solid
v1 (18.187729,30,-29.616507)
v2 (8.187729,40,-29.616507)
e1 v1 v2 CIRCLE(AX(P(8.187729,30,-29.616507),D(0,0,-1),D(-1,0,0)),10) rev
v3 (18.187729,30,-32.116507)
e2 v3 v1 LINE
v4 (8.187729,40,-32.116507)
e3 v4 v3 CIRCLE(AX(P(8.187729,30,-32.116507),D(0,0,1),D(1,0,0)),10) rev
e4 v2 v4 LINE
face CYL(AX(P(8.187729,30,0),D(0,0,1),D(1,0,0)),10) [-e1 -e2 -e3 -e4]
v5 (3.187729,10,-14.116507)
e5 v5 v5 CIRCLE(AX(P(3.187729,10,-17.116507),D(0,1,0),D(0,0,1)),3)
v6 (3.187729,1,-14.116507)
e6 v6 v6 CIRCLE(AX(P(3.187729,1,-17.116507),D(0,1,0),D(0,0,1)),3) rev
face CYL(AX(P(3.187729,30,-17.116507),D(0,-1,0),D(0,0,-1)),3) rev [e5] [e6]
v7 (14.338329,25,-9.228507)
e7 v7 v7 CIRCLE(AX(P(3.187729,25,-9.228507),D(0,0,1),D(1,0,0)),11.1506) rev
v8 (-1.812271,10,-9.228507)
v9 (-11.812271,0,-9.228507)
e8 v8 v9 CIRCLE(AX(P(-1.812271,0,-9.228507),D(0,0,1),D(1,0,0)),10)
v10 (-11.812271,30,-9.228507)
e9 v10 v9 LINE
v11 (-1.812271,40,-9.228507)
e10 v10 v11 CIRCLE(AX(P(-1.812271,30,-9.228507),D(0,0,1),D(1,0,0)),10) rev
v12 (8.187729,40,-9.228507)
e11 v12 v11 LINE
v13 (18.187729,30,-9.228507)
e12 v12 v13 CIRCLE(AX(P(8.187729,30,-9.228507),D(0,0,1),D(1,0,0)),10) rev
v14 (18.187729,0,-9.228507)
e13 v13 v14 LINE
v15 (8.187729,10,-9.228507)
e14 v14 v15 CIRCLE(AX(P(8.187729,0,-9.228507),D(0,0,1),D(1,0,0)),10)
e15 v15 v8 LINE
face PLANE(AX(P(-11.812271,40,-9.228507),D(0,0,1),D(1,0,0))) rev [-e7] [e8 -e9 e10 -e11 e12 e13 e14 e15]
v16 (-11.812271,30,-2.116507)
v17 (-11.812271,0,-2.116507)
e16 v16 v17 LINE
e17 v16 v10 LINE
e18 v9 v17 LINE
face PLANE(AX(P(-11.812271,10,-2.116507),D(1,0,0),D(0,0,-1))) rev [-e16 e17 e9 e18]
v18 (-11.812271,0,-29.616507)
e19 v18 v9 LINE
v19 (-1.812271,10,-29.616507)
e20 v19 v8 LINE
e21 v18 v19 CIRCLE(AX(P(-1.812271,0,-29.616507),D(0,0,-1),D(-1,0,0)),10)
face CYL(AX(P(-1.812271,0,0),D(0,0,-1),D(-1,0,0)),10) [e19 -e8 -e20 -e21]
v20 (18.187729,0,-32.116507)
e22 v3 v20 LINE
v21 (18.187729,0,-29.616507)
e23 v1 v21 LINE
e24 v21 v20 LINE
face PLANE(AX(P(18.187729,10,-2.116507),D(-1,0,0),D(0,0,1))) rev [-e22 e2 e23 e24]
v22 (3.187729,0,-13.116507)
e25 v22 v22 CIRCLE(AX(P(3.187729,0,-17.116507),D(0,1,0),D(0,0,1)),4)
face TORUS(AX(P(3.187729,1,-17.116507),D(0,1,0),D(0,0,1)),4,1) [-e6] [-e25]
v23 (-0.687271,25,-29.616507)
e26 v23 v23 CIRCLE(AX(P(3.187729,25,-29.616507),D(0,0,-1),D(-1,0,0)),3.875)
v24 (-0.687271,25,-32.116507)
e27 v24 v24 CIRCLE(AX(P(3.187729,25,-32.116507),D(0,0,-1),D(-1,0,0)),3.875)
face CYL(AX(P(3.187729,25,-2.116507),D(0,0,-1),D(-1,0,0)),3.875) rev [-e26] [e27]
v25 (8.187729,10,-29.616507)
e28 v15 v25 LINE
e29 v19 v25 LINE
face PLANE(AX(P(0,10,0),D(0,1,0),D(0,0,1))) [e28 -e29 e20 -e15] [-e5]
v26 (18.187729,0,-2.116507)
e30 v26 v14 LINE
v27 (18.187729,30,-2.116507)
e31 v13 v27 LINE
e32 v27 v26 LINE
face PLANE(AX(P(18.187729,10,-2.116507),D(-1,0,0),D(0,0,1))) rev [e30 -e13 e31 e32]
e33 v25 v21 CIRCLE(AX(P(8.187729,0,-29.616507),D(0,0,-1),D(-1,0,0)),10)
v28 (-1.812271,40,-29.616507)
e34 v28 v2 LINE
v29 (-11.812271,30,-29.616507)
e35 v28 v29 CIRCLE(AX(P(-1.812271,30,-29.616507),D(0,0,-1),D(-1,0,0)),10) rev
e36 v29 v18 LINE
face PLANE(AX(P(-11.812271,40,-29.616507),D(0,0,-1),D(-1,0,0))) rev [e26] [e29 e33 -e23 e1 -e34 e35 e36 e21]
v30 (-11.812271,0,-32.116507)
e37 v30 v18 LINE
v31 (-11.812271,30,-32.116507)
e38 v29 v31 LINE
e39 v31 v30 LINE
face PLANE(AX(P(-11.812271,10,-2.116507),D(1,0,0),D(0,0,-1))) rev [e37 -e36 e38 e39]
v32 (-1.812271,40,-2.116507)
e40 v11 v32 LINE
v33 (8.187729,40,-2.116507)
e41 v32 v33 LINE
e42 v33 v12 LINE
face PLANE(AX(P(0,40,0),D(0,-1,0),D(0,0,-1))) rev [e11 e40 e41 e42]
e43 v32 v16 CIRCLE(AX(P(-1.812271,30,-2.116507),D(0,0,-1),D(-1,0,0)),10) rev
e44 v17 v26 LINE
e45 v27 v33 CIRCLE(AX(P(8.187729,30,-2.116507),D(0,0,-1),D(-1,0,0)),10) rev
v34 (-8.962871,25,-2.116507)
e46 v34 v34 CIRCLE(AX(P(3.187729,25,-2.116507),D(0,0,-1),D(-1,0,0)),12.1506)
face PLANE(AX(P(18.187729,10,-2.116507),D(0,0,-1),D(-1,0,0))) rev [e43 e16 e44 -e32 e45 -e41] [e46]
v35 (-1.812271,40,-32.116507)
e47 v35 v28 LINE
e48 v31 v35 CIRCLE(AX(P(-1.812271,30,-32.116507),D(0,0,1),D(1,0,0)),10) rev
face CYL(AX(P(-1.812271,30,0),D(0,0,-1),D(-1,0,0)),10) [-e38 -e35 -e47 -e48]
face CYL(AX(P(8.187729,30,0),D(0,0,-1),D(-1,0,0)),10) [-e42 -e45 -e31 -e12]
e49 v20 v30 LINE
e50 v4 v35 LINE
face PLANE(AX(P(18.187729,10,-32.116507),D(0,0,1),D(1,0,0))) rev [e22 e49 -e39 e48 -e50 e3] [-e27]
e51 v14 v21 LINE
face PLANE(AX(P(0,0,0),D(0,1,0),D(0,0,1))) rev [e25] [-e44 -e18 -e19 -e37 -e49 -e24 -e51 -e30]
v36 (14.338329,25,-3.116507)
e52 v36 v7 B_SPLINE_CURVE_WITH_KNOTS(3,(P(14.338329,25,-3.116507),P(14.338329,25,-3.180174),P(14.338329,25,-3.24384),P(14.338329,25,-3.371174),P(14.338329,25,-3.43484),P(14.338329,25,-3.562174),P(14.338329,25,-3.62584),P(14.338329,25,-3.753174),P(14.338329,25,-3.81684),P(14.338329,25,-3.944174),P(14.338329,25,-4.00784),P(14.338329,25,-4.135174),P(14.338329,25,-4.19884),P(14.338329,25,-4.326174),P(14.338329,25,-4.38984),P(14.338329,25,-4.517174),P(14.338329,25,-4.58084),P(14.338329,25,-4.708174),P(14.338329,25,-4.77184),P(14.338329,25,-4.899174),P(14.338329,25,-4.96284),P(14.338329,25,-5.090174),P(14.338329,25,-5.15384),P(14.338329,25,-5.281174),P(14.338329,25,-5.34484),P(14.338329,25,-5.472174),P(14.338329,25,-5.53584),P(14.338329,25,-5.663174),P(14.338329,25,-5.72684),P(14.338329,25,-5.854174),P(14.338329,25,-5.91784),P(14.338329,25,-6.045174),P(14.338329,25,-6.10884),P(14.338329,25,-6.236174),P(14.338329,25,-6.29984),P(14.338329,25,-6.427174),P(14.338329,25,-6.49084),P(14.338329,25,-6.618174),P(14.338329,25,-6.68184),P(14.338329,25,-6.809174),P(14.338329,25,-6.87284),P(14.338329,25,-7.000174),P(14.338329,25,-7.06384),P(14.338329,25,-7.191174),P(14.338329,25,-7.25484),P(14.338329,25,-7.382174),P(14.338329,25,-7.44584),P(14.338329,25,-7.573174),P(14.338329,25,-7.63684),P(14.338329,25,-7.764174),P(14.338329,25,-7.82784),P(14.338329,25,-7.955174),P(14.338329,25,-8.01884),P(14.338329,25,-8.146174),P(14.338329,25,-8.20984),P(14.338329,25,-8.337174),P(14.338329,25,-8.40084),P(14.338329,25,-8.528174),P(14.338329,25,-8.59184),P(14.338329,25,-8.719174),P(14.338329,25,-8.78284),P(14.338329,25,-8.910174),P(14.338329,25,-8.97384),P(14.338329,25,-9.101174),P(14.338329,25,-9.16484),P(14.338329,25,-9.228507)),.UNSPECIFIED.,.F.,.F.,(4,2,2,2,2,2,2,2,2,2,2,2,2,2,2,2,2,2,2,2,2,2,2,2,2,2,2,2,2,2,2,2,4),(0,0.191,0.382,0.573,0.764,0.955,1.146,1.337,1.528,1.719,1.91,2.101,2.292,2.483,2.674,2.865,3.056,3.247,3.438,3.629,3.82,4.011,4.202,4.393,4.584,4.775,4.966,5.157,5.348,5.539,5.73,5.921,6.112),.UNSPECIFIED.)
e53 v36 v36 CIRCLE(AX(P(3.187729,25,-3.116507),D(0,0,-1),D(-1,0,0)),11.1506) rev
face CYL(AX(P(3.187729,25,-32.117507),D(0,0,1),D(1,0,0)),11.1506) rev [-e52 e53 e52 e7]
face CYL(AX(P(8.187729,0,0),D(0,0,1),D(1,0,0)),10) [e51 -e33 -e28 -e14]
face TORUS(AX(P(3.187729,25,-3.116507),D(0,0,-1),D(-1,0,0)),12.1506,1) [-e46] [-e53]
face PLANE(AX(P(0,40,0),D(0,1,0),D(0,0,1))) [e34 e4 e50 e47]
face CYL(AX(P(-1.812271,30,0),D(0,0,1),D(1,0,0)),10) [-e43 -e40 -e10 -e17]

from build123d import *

# Parameters (mm, degrees)
SKETCH1_W           = 30
SKETCH1_H           = 30
BOSS_EXTRUDE1_DEPTH = 10
SKETCH2_W           = 30
SKETCH2_H           = 2.5
BOSS_EXTRUDE2_DEPTH = 30
SKETCH3_W           = 30
SKETCH3_H           = 7.112
BOSS_EXTRUDE3_DEPTH = 30
CUT_EXTRUDE2_REACH  = 55.205
SKETCH4_R           = 11.1506
FILLET2_R           = 1
SKETCH5_R           = 3.875
CUT_EXTRUDE3_DEPTH  = 30
SKETCH6_R           = 3
CUT_EXTRUDE4_DEPTH  = 30
FILLET3_R           = 1
FILLET4_R           = 10
FILLET5_R           = 10
FILLET6_R           = 10
FILLET7_R           = 10


with BuildPart() as part:
    # Sketch1 → Boss-Extrude1 (new body)
    with BuildSketch(Plane(origin=(0, 0, 0), x_dir=(1, 0, 0), z_dir=(0, 1, 0))):
        with Locations((3.18772861, 17.116506927)):
            Rectangle(SKETCH1_W, SKETCH1_H)
    extrude(amount=BOSS_EXTRUDE1_DEPTH)

    # Sketch2 → Boss-Extrude2 (add)
    with BuildSketch(Plane(origin=(0, 10, 0), x_dir=(1, 0, 0), z_dir=(0, 1, 0))):
        with Locations((3.18772861, 30.866506927)):
            Rectangle(SKETCH2_W, SKETCH2_H)
    extrude(amount=BOSS_EXTRUDE2_DEPTH)

    # Sketch3 → Boss-Extrude3 (add)
    with BuildSketch(Plane(origin=(0, 10, 0), x_dir=(1, 0, 0), z_dir=(0, 1, 0))):
        with Locations((3.18772861, 5.672506927)):
            Rectangle(SKETCH3_W, SKETCH3_H)
    extrude(amount=BOSS_EXTRUDE3_DEPTH)

    # Sketch4 → Cut-Extrude2 (cut, up to next)
    with BuildSketch(Plane.XY.offset(-2.116506927), mode=Mode.PRIVATE) as cut_extrude2_sk1:
        with Locations((3.18772861, 25)):
            Circle(SKETCH4_R)
    cut_extrude2_tool1 = extrude(cut_extrude2_sk1.sketch, amount=-CUT_EXTRUDE2_REACH, mode=Mode.PRIVATE) & part.part
    add(cut_extrude2_tool1.solids().sort_by_distance((3.187729, 25, -2.116507))[0], mode=Mode.SUBTRACT)

    # Fillet2
    fillet2_edges = [part.edges().sort_by_distance(p)[0] for p in [
        (-7.96287139, 25, -2.116506927),
    ]]
    fillet(fillet2_edges, radius=FILLET2_R)

    # Sketch5 → Cut-Extrude3 (cut)
    with BuildSketch(Plane(origin=(0, 0, -32.116506927), x_dir=(-1, 0, 0), z_dir=(0, 0, -1))):
        with Locations((-3.18772861, 25)):
            Circle(SKETCH5_R)
    extrude(amount=-CUT_EXTRUDE3_DEPTH, mode=Mode.SUBTRACT)

    # Sketch6 → Cut-Extrude4 (cut)
    with BuildSketch(Plane(origin=(0, 0, 0), x_dir=(-1, 0, 0), z_dir=(0, -1, 0))):
        with Locations(Location((-3.18772861, 17.116506927, 0), (0, 0, 90))):
            Circle(SKETCH6_R)
    extrude(amount=-CUT_EXTRUDE4_DEPTH, mode=Mode.SUBTRACT)

    # Fillet3
    fillet3_edges = [part.edges().sort_by_distance(p)[0] for p in [
        (3.18772861, 0, -14.116506927),
    ]]
    fillet(fillet3_edges, radius=FILLET3_R)

    # Fillet4
    fillet4_edges = [part.edges().sort_by_distance(p)[0] for p in [
        (-11.81227139, 40, -30.866506927),
        (18.18772861, 40, -30.866506927),
    ]]
    fillet(fillet4_edges, radius=FILLET4_R)

    # Fillet5
    fillet5_edges = [part.edges().sort_by_distance(p)[0] for p in [
        (18.18772861, 10, -19.422506927),
    ]]
    fillet(fillet5_edges, radius=FILLET5_R - 0.0001)  # a hair under: the kernel refuses the full size

    # Fillet6
    fillet6_edges = [part.edges().sort_by_distance(p)[0] for p in [
        (-11.81227139, 10, -19.422506927),
    ]]
    fillet(fillet6_edges, radius=FILLET6_R - 0.0001)  # a hair under: the kernel refuses the full size

    # Fillet7
    fillet7_edges = [part.edges().sort_by_distance(p)[0] for p in [
        (-11.81227139, 40, -5.672506927),
        (18.18772861, 40, -5.672506927),
    ]]
    fillet(fillet7_edges, radius=FILLET7_R)


solid = part.part
